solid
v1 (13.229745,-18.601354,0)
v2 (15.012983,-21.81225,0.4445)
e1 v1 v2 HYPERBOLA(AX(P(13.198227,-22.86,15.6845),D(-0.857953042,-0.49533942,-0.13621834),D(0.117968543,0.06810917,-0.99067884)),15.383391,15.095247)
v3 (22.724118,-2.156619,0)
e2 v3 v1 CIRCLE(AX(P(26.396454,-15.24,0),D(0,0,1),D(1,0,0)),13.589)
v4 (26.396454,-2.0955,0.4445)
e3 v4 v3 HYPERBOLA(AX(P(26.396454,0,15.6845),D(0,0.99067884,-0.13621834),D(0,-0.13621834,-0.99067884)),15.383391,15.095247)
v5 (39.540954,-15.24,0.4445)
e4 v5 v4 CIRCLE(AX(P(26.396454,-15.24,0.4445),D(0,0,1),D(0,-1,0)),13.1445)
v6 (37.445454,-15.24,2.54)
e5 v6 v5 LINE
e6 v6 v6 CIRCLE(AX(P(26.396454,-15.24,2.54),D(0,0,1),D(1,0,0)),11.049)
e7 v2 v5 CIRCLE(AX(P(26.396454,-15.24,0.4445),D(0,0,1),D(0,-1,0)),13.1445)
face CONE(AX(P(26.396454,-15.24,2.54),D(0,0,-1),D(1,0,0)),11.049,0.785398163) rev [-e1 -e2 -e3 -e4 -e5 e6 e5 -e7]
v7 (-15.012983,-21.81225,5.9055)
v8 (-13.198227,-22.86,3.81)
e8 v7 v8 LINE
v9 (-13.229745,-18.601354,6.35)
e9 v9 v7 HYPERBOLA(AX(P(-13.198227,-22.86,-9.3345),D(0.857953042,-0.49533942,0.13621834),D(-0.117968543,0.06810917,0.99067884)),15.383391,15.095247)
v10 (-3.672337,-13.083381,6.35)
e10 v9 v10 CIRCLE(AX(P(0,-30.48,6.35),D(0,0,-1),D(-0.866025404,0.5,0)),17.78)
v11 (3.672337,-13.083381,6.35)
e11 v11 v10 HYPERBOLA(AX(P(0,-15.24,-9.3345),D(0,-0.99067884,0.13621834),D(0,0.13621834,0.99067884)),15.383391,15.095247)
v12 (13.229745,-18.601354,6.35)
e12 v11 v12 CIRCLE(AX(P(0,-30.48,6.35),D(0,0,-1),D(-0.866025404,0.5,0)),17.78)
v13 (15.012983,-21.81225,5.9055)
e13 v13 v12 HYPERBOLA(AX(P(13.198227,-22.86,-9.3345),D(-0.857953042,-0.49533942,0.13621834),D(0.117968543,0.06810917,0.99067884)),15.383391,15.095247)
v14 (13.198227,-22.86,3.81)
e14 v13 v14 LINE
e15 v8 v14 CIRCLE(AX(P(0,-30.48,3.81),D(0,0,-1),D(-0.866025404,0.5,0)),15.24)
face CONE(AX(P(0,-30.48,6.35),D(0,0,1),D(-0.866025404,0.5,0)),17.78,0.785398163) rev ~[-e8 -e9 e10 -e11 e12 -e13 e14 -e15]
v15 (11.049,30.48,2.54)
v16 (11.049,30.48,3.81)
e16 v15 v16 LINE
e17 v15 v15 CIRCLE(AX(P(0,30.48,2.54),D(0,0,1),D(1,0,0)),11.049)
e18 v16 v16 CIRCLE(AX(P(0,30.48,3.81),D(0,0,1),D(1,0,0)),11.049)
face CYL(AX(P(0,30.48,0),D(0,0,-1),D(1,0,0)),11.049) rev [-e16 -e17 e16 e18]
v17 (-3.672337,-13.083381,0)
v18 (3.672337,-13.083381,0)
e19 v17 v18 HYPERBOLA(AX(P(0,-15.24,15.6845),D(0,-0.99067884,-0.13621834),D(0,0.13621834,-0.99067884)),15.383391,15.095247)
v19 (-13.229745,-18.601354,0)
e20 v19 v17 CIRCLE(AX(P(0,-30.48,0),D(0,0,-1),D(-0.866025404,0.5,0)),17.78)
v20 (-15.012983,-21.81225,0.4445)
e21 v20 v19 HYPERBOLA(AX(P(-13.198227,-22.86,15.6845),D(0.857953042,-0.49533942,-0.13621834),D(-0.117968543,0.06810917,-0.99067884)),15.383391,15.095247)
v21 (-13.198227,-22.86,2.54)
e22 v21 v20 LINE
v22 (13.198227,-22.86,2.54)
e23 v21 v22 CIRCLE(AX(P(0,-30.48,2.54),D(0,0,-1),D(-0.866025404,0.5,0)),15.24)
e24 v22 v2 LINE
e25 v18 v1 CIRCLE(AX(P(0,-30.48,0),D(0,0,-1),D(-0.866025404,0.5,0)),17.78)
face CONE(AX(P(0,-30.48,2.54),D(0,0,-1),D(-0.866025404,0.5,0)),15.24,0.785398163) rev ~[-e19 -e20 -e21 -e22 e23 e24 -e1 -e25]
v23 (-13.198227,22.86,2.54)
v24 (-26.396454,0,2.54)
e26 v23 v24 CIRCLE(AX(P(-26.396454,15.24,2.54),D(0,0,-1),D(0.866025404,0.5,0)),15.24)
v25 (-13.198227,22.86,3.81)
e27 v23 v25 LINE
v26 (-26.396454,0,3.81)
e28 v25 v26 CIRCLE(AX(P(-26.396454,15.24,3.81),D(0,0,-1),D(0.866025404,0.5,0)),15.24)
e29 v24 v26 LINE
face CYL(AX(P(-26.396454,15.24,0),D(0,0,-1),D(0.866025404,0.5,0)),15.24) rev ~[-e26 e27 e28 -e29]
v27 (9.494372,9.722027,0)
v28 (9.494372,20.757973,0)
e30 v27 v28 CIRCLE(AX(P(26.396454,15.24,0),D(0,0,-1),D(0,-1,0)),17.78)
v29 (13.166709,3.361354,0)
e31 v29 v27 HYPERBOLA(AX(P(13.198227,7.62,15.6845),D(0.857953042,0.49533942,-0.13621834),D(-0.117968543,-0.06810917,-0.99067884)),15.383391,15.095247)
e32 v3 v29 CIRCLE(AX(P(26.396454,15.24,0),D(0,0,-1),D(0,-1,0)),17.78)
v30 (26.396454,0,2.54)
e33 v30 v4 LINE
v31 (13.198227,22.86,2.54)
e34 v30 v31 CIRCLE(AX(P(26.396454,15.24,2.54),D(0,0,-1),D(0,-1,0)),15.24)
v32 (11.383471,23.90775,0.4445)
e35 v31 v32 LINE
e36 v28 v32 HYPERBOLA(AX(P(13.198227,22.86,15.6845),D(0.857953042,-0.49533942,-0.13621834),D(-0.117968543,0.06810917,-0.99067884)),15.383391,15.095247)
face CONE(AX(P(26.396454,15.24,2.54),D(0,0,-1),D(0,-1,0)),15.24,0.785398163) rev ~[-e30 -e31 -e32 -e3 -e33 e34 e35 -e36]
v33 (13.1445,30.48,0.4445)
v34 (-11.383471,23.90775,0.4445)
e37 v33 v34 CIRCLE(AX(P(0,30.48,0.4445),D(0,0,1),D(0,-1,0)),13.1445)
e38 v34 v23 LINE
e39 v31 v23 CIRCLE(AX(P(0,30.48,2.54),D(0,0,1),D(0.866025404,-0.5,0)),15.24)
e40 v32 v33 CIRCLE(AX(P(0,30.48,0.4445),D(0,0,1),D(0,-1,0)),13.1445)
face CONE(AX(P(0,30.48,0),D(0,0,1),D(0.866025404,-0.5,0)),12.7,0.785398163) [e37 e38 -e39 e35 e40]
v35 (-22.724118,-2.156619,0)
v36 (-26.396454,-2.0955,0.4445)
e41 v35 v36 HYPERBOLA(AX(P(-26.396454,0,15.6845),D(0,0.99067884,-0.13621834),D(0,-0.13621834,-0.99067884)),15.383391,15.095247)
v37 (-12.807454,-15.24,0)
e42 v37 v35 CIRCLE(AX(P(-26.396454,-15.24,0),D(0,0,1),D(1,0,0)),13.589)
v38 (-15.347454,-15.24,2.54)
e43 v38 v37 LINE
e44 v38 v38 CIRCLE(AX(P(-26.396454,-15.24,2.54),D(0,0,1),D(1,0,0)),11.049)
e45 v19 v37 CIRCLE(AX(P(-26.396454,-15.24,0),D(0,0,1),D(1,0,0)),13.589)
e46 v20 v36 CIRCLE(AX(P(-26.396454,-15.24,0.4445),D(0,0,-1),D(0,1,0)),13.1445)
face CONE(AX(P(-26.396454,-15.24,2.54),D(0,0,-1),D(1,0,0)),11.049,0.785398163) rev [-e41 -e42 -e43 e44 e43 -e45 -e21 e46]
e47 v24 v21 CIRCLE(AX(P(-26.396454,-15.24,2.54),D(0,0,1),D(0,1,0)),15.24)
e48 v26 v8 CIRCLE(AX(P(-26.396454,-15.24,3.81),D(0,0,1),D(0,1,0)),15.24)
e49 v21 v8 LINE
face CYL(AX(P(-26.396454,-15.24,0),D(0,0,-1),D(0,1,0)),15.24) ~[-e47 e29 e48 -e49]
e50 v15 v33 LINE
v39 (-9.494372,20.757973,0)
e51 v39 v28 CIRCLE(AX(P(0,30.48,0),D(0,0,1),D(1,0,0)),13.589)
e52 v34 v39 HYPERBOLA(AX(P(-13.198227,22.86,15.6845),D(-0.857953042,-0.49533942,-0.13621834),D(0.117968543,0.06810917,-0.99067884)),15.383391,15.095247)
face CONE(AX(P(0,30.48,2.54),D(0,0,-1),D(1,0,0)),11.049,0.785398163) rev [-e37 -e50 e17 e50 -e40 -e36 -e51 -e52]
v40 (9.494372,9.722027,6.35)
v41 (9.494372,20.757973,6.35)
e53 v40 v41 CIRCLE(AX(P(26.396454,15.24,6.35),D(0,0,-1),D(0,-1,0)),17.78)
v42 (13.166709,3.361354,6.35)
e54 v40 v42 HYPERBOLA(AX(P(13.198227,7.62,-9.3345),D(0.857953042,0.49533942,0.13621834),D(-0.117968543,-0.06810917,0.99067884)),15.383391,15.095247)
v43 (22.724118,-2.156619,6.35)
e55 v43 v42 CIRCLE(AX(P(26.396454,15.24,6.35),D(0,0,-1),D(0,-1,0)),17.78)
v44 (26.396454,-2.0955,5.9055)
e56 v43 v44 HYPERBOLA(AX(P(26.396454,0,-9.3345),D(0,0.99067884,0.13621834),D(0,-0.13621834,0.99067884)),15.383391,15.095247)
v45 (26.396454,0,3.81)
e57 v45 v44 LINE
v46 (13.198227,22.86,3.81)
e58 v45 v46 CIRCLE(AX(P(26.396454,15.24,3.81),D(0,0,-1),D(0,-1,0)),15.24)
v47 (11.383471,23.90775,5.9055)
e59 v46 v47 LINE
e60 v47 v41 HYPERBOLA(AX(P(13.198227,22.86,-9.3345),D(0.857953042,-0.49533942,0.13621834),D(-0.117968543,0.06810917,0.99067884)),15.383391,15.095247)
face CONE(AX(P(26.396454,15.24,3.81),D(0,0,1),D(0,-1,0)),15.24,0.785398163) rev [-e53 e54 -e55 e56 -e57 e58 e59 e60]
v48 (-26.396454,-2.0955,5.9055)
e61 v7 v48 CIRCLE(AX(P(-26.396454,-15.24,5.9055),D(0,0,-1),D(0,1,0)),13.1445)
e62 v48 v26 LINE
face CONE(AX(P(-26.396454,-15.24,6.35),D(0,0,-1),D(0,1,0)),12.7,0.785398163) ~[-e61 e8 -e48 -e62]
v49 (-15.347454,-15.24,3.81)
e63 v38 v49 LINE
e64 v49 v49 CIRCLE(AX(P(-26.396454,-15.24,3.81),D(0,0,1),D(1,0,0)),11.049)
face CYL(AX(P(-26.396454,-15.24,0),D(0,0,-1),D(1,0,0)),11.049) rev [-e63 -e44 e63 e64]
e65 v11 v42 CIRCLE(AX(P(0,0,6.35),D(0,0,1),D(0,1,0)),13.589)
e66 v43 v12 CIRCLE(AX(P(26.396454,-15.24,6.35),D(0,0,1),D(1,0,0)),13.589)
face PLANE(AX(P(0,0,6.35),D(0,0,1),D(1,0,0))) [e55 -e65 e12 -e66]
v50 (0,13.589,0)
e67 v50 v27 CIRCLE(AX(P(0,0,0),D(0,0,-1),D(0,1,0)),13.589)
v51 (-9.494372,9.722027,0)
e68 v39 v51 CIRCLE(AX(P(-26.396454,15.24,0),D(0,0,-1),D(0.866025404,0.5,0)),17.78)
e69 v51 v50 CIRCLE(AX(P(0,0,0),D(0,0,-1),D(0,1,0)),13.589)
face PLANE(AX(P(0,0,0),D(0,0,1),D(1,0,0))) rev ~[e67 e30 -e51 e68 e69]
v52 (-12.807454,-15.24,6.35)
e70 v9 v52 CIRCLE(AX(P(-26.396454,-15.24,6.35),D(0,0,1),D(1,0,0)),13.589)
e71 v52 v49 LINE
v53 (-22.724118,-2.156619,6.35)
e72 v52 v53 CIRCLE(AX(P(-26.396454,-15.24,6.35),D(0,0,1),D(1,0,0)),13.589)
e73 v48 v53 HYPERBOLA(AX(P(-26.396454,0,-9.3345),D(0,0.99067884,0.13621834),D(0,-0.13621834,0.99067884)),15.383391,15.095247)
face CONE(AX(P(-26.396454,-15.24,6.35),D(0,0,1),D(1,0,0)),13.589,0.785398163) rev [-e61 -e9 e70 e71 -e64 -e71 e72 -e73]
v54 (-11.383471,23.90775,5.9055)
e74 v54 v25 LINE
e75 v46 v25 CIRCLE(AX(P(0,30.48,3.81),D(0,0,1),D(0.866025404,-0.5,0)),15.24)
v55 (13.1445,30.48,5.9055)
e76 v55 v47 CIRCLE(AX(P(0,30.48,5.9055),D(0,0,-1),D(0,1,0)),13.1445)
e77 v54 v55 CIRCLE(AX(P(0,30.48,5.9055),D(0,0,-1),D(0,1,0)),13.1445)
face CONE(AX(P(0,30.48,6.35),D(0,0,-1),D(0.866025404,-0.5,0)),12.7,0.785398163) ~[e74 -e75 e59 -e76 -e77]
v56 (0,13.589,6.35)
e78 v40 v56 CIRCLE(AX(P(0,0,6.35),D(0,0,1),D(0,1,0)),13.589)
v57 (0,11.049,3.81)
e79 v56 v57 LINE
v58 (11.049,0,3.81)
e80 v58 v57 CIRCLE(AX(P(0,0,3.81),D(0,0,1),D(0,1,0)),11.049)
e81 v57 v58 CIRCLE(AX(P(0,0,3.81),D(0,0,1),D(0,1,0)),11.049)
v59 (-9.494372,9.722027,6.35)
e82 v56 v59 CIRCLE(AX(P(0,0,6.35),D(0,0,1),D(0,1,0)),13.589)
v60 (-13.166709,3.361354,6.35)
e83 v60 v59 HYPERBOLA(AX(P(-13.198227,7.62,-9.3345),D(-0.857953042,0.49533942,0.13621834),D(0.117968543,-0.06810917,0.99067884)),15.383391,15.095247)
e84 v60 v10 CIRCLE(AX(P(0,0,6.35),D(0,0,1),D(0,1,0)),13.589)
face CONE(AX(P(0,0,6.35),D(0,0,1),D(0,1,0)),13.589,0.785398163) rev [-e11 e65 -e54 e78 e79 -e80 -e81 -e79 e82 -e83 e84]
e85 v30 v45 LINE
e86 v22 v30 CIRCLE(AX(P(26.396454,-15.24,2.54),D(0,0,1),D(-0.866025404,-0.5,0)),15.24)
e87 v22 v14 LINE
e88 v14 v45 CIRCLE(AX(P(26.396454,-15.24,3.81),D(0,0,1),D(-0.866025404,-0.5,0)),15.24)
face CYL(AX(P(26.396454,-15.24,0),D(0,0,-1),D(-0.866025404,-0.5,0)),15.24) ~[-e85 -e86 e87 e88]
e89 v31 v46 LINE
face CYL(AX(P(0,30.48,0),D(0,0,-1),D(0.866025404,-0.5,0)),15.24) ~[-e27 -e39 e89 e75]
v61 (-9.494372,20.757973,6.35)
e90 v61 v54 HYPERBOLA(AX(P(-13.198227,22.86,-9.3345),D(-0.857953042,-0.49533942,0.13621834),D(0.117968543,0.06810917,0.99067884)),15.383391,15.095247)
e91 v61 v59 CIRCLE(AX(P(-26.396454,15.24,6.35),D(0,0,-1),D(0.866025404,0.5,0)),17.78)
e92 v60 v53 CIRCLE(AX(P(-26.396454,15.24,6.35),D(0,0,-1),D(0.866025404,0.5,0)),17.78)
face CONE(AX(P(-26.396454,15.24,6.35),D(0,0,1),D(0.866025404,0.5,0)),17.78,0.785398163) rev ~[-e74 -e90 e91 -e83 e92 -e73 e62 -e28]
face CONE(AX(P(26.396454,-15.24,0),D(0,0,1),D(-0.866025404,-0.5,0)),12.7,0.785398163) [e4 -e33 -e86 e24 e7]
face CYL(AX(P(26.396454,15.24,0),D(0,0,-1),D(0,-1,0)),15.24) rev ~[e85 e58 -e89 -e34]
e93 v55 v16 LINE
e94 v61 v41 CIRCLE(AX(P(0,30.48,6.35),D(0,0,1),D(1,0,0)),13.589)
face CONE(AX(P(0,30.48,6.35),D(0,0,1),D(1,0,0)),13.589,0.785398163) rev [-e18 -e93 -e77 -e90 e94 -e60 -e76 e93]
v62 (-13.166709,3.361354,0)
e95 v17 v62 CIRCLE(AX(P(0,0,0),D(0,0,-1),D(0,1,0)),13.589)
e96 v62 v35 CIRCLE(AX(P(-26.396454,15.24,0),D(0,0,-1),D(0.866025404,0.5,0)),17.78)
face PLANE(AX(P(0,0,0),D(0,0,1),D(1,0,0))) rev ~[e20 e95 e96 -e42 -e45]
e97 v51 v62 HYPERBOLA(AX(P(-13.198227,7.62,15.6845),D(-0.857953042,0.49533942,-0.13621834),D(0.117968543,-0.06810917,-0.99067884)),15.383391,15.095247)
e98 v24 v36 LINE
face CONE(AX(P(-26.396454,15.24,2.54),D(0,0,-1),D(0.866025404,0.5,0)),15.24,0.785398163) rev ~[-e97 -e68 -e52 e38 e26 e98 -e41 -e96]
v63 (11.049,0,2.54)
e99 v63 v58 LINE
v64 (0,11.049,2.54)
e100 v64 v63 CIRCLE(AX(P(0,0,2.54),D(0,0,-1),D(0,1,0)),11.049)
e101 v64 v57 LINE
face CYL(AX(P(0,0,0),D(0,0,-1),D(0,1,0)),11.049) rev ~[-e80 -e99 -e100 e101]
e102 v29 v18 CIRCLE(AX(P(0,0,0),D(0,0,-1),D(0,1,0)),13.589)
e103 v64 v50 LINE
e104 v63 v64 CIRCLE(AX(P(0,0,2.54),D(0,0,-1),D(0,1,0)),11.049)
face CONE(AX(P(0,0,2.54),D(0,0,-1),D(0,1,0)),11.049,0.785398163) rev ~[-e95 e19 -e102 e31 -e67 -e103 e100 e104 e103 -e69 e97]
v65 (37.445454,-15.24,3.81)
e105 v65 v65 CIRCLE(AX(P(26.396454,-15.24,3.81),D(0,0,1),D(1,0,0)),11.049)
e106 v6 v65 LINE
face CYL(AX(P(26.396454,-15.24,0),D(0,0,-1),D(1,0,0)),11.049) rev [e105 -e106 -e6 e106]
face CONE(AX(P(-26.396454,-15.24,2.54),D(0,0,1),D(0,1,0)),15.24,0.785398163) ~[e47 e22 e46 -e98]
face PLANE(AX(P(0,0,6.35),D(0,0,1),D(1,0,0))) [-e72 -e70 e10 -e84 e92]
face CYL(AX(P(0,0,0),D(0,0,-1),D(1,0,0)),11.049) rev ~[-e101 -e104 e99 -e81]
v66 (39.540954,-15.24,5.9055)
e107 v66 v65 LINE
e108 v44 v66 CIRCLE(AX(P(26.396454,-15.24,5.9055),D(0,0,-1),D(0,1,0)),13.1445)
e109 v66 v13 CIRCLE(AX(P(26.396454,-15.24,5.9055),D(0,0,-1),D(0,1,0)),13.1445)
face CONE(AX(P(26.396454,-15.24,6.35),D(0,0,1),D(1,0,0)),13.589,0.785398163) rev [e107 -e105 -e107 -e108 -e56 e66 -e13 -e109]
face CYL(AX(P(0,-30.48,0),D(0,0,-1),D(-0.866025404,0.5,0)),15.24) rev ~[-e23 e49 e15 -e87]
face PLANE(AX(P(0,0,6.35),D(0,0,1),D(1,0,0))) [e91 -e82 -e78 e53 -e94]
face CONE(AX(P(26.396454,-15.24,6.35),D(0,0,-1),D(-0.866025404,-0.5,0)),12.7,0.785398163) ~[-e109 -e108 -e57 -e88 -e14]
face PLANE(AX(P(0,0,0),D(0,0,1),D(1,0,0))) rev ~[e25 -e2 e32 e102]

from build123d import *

# Parameters (mm, degrees)
F0_R         = 11.049
F1_DEPTH     = 6.35
F2_T2_ANGLE  = 120
F2_T4_ANGLE  = 240
F2_T6_ANGLE  = 120
F2_T8_ANGLE  = 240
F2_T10_ANGLE = 120
F2_T12_ANGLE = 240
F2_T22_ANGLE = 120
F2_T24_ANGLE = 240
F2_T26_ANGLE = 120
F2_T28_ANGLE = 240
F2_T30_ANGLE = 120
F2_T32_ANGLE = 240


# Not quite as in the source:
# - a fillet or chamfer that OpenCascade refuses, or shapes differently, is made with other operations: its cross-section is extruded or revolved along the edge and cut away or added


with BuildPart() as f1:
    # F0 (on Top) → F1 (new body)
    with BuildSketch(Plane.XY):
        with BuildLine():
            ThreePointArc((26.3964543073, 0), (13.1982271537, 7.62), (13.1982271537, 22.86))
            ThreePointArc((13.1982271537, 22.86), (0, 45.72), (-13.1982271537, 22.86))
            ThreePointArc((-13.1982271537, 22.86), (-13.1982271537, 7.62), (-26.3964543073, 0))
            ThreePointArc((-26.3964543073, 0), (-39.594681461, -22.86), (-13.1982271537, -22.86))
            ThreePointArc((-13.1982271537, -22.86), (0, -15.24), (13.1982271537, -22.86))
            ThreePointArc((13.1982271537, -22.86), (39.594681461, -22.86), (26.3964543073, 0))
        make_face()
        with Locations((-26.3964543073, -15.24)):
            Circle(F0_R, mode=Mode.SUBTRACT)
        with Locations((26.3964543073, -15.24)):
            Circle(F0_R, mode=Mode.SUBTRACT)
        with BuildLine():
            ThreePointArc((0, 11.049), (7.8128228253, 7.8128228253), (11.049, 0))
            ThreePointArc((11.049, 0), (-7.8128228253, -7.8128228253), (0, 11.049))
        make_face(mode=Mode.SUBTRACT)
        with Locations((0, 30.48)):
            Circle(F0_R, mode=Mode.SUBTRACT)
    extrude(amount=F1_DEPTH)

    # F2: chamfer of 2.54 on 20 edges, made by hand

    # F2_s1 → F2_t2 (revolve, cut)
    with BuildSketch(Plane.YZ.offset(26.3964543073)):
        Polygon((0, 3.81), (-2.54, 6.35), (0, 6.35), align=None)
    revolve(axis=Axis((26.3964543073, 15.24, 6.35), (0, 0, -1)), revolution_arc=F2_T2_ANGLE, mode=Mode.SUBTRACT)

    # F2_s3 → F2_t4 (revolve, cut)
    with BuildSketch(Plane(origin=(13.1982271537, 22.86, 0), x_dir=(0, 0, 1), z_dir=(-0.5, -0.8660254038, 0))):
        Polygon((6.35, 2.54), (3.81, 0), (6.35, 0), align=None)
    revolve(axis=Axis((0, 30.48, 6.35), (0, 0, 1)), revolution_arc=F2_T4_ANGLE, mode=Mode.SUBTRACT)

    # F2_s5 → F2_t6 (revolve, cut)
    with BuildSketch(Plane(origin=(-13.1982271537, 22.86, 0), x_dir=(0, 0, 1), z_dir=(-0.5, 0.8660254038, 0))):
        Polygon((6.35, 2.54), (3.81, 0), (6.35, 0), align=None)
    revolve(axis=Axis((-26.3964543073, 15.24, 6.35), (0, 0, -1)), revolution_arc=F2_T6_ANGLE, mode=Mode.SUBTRACT)

    # F2_s7 → F2_t8 (revolve, cut)
    with BuildSketch(Plane.YZ.offset(-26.3964543073)):
        Polygon((-2.54, 6.35), (0, 3.81), (0, 6.35), align=None)
    revolve(axis=Axis((-26.3964543073, -15.24, 6.35), (0, 0, 1)), revolution_arc=F2_T8_ANGLE, mode=Mode.SUBTRACT)

    # F2_s9 → F2_t10 (revolve, cut)
    with BuildSketch(Plane(origin=(-13.1982271537, -22.86, 0), x_dir=(0, 0, 1), z_dir=(-0.5, -0.8660254038, 0))):
        Polygon((6.35, 2.54), (3.81, 0), (6.35, 0), align=None)
    revolve(axis=Axis((0, -30.48, 6.35), (0, 0, -1)), revolution_arc=F2_T10_ANGLE, mode=Mode.SUBTRACT)

    # F2_s11 → F2_t12 (revolve, cut)
    with BuildSketch(Plane(origin=(13.1982271537, -22.86, 0), x_dir=(0, 0, 1), z_dir=(-0.5, 0.8660254038, 0))):
        Polygon((6.35, 2.54), (3.81, 0), (6.35, 0), align=None)
    revolve(axis=Axis((26.3964543073, -15.24, 6.35), (0, 0, 1)), revolution_arc=F2_T12_ANGLE, mode=Mode.SUBTRACT)

    # F2_s13 → F2_t14 (revolve, cut)
    with BuildSketch(Plane.XZ.offset(15.24)):
        Polygon((-12.8074543073, 6.35), (-15.3474543073, 3.81), (-15.3474543073, 6.35), align=None)
    revolve(axis=Axis((-26.3964543073, -15.24, 6.35), (0, 0, 1)), mode=Mode.SUBTRACT)

    # F2_s15 → F2_t16 (revolve, cut)
    with BuildSketch(Plane.XZ.offset(15.24)):
        Polygon((39.9854543073, 6.35), (37.4454543073, 3.81), (37.4454543073, 6.35), align=None)
    revolve(axis=Axis((26.3964543073, -15.24, 6.35), (0, 0, 1)), mode=Mode.SUBTRACT)

    # F2_s17 → F2_t18 (revolve, cut)
    with BuildSketch(Plane.YZ):
        Polygon((13.589, 6.35), (11.049, 3.81), (11.049, 6.35), align=None)
    revolve(axis=Axis((0, 0, 6.35), (0, 0, 1)), mode=Mode.SUBTRACT)

    # F2_s19 → F2_t20 (revolve, cut)
    with BuildSketch(Plane.XZ.offset(-30.48)):
        Polygon((13.589, 6.35), (11.049, 3.81), (11.049, 6.35), align=None)
    revolve(axis=Axis((0, 30.48, 6.35), (0, 0, 1)), mode=Mode.SUBTRACT)

    # F2_s21 → F2_t22 (revolve, cut)
    with BuildSketch(Plane.YZ.offset(26.3964543073)):
        Polygon((0, 2.54), (-2.54, 0), (0, 0), align=None)
    revolve(axis=Axis((26.3964543073, 15.24, 0), (0, 0, -1)), revolution_arc=F2_T22_ANGLE, mode=Mode.SUBTRACT)

    # F2_s23 → F2_t24 (revolve, cut)
    with BuildSketch(Plane(origin=(13.1982271537, 22.86, 0), x_dir=(0, 0, 1), z_dir=(-0.5, -0.8660254038, 0))):
        Polygon((0, 2.54), (2.54, 0), (0, 0), align=None)
    revolve(axis=Axis((0, 30.48, 0), (0, 0, 1)), revolution_arc=F2_T24_ANGLE, mode=Mode.SUBTRACT)

    # F2_s25 → F2_t26 (revolve, cut)
    with BuildSketch(Plane(origin=(-13.1982271537, 22.86, 0), x_dir=(0, 0, 1), z_dir=(-0.5, 0.8660254038, 0))):
        Polygon((2.54, 0), (0, 2.54), (0, 0), align=None)
    revolve(axis=Axis((-26.3964543073, 15.24, 0), (0, 0, -1)), revolution_arc=F2_T26_ANGLE, mode=Mode.SUBTRACT)

    # F2_s27 → F2_t28 (revolve, cut)
    with BuildSketch(Plane.YZ.offset(-26.3964543073)):
        Polygon((0, 2.54), (-2.54, 0), (0, 0), align=None)
    revolve(axis=Axis((-26.3964543073, -15.24, 0), (0, 0, 1)), revolution_arc=F2_T28_ANGLE, mode=Mode.SUBTRACT)

    # F2_s29 → F2_t30 (revolve, cut)
    with BuildSketch(Plane(origin=(-13.1982271537, -22.86, 0), x_dir=(0, 0, 1), z_dir=(-0.5, -0.8660254038, 0))):
        Polygon((2.54, 0), (0, 2.54), (0, 0), align=None)
    revolve(axis=Axis((0, -30.48, 0), (0, 0, -1)), revolution_arc=F2_T30_ANGLE, mode=Mode.SUBTRACT)

    # F2_s31 → F2_t32 (revolve, cut)
    with BuildSketch(Plane(origin=(13.1982271537, -22.86, 0), x_dir=(0, 0, 1), z_dir=(-0.5, 0.8660254038, 0))):
        Polygon((0, 2.54), (2.54, 0), (0, 0), align=None)
    revolve(axis=Axis((26.3964543073, -15.24, 0), (0, 0, 1)), revolution_arc=F2_T32_ANGLE, mode=Mode.SUBTRACT)

    # F2_s33 → F2_t34 (revolve, cut)
    with BuildSketch(Plane.XZ.offset(15.24)):
        Polygon((-15.3474543073, 2.54), (-12.8074543073, 0), (-15.3474543073, 0), align=None)
    revolve(axis=Axis((-26.3964543073, -15.24, 0), (0, 0, 1)), mode=Mode.SUBTRACT)

    # F2_s35 → F2_t36 (revolve, cut)
    with BuildSketch(Plane.XZ.offset(15.24)):
        Polygon((37.4454543073, 2.54), (39.9854543073, 0), (37.4454543073, 0), align=None)
    revolve(axis=Axis((26.3964543073, -15.24, 0), (0, 0, 1)), mode=Mode.SUBTRACT)

    # F2_s37 → F2_t38 (revolve, cut)
    with BuildSketch(Plane.YZ):
        Polygon((11.049, 2.54), (13.589, 0), (11.049, 0), align=None)
    revolve(axis=Axis((0, 0, 0), (0, 0, -1)), mode=Mode.SUBTRACT)

    # F2_s39 → F2_t40 (revolve, cut)
    with BuildSketch(Plane.XZ.offset(-30.48)):
        Polygon((11.049, 2.54), (13.589, 0), (11.049, 0), align=None)
    revolve(axis=Axis((0, 30.48, 0), (0, 0, 1)), mode=Mode.SUBTRACT)


solid = f1.part
